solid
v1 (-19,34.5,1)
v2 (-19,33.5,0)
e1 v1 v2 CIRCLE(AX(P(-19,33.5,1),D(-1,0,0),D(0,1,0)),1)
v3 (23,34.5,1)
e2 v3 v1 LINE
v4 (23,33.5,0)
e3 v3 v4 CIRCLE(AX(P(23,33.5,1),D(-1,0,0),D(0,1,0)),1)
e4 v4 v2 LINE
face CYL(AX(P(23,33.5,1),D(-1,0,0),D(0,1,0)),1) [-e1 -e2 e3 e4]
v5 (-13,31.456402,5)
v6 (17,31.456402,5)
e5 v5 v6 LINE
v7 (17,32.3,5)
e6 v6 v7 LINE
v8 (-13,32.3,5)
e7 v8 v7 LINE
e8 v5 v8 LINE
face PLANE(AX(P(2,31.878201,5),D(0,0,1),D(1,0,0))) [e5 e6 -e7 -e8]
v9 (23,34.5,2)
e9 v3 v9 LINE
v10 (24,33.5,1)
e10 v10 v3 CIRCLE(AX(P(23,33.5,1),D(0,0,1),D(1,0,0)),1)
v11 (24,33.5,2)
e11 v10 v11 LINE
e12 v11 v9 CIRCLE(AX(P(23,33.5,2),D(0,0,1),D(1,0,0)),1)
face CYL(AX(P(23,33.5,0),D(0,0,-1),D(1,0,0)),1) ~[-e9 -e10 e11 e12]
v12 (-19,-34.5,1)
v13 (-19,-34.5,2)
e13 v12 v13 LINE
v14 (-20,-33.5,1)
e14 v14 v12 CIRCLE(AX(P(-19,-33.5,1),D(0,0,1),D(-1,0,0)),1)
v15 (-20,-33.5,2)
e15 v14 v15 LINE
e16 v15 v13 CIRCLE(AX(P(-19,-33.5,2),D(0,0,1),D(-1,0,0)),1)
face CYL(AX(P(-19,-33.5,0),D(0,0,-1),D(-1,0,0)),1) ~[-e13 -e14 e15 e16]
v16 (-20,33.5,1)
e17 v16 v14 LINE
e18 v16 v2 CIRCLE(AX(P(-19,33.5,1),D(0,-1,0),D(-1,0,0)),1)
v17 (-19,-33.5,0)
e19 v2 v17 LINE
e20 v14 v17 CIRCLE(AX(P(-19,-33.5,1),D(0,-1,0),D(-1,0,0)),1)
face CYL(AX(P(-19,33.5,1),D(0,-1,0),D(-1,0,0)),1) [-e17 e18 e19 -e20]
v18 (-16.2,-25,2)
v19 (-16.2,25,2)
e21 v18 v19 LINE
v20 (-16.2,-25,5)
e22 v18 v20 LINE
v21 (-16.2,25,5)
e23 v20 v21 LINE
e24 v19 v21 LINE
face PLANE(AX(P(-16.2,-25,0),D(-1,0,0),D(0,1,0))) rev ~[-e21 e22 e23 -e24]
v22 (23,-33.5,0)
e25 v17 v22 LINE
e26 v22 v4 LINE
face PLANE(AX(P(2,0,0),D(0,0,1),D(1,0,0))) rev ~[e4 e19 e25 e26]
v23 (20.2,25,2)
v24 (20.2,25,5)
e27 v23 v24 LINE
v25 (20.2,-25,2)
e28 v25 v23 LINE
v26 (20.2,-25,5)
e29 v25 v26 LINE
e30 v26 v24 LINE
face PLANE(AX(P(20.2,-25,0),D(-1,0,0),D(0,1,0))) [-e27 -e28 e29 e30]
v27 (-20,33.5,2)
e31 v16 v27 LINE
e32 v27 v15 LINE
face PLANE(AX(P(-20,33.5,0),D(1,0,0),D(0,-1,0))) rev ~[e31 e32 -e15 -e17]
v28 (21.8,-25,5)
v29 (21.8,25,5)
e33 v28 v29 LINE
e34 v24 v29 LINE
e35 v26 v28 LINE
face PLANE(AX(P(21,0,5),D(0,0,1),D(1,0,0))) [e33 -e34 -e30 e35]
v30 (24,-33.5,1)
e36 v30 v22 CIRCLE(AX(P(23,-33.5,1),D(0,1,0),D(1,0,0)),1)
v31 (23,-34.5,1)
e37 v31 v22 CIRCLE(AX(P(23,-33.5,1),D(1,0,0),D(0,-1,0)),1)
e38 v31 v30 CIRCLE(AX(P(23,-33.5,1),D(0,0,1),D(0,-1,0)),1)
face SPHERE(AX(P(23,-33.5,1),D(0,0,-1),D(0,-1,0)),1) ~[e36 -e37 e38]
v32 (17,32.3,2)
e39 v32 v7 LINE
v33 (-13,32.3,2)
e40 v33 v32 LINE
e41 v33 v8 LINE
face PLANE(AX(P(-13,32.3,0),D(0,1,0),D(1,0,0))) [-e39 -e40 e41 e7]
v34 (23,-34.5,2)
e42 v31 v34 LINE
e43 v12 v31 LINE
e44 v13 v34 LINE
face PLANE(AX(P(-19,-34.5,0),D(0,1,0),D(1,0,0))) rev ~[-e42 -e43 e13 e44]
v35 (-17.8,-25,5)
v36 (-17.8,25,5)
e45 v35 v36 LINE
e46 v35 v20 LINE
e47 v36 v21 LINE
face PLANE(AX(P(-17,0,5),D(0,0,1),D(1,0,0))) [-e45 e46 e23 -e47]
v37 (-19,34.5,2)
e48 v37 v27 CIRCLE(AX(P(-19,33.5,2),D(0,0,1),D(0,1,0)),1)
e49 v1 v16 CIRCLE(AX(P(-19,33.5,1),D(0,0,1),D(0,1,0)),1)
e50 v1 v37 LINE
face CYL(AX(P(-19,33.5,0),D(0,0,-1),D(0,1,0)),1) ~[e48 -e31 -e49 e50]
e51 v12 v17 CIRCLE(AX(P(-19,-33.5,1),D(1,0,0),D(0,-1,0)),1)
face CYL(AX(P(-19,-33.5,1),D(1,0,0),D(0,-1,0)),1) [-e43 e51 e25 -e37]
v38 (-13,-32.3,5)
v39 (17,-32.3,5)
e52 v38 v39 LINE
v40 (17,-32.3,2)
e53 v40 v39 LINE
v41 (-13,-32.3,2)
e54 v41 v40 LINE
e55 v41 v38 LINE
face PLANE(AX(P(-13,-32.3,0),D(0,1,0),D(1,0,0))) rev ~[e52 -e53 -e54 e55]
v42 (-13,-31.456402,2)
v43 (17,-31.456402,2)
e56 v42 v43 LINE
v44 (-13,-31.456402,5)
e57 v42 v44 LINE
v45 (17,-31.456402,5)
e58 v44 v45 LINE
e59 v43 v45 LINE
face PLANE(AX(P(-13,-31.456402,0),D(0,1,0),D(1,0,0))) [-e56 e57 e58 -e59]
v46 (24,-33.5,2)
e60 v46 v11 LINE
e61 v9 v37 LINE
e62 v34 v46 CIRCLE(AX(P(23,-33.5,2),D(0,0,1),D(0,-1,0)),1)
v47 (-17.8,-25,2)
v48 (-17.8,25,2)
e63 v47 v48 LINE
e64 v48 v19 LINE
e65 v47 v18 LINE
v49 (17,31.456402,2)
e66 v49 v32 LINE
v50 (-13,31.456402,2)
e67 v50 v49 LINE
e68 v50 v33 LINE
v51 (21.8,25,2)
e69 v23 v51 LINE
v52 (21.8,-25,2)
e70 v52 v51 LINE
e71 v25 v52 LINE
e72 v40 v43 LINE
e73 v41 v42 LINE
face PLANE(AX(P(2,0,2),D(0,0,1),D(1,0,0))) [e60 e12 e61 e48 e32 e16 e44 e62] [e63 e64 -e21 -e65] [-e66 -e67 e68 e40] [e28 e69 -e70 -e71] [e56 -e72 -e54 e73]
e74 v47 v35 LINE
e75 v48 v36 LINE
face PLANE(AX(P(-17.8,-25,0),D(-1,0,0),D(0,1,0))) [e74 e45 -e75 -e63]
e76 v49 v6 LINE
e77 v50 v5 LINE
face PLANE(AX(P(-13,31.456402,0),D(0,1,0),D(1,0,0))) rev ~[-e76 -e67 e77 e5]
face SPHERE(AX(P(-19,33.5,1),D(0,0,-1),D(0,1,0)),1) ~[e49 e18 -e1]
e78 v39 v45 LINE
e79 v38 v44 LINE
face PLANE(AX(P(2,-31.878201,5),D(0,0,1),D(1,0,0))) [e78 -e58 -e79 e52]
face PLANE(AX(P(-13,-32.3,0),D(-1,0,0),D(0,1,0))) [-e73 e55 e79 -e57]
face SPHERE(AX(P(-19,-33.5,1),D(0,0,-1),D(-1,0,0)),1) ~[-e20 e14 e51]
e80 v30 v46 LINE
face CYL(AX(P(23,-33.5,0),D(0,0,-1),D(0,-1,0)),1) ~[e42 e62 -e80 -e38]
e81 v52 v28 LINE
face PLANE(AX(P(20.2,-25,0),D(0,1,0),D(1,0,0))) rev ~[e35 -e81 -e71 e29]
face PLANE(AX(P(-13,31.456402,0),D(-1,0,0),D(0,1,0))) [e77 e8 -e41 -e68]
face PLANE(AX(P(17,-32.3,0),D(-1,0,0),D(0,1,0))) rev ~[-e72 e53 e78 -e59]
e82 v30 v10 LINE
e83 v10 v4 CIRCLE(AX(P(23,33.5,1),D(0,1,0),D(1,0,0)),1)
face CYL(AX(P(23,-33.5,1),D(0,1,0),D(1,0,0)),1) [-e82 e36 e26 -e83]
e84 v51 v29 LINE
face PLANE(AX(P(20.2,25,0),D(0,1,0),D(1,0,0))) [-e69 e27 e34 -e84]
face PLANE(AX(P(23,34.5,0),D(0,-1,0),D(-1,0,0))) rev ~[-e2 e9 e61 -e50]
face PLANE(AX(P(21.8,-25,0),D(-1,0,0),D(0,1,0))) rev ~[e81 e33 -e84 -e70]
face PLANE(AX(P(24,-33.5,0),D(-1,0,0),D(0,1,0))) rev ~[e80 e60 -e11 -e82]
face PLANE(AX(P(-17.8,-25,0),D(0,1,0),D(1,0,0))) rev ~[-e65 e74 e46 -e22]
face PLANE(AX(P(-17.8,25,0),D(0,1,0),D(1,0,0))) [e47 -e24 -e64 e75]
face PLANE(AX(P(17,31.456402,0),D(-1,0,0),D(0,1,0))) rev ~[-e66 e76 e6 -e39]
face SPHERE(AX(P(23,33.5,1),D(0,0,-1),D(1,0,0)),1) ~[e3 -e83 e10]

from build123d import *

# Parameters (mm, degrees)
F0_W     = 30
F0_H     = 0.843597576
F0_W_2   = 1.6
F0_H_2   = 50
F1_DEPTH = 2
F2_DEPTH = 5
F3_R     = 1


with BuildPart() as f1:
    # F0 (on Top) → F1 (new body)
    with BuildSketch(Plane.XY):
        with BuildLine():
            Line((-19, -34.5), (23, -34.5))
            ThreePointArc((23, -34.5), (23.7071067812, -34.2071067812), (24, -33.5))
            Line((24, -33.5), (24, 33.5))
            ThreePointArc((24, 33.5), (23.7071067812, 34.2071067812), (23, 34.5))
            Line((23, 34.5), (-19, 34.5))
            ThreePointArc((-19, 34.5), (-19.7071067812, 34.2071067812), (-20, 33.5))
            Line((-20, 33.5), (-20, -33.5))
            ThreePointArc((-20, -33.5), (-19.7071067812, -34.2071067812), (-19, -34.5))
        make_face()
        with Locations((2, -31.878201212)):
            Rectangle(F0_W, F0_H, mode=Mode.SUBTRACT)
        with Locations((-17, 0)):
            Rectangle(F0_W_2, F0_H_2, mode=Mode.SUBTRACT)
        with Locations((21, 0)):
            Rectangle(F0_W_2, F0_H_2, mode=Mode.SUBTRACT)
        with Locations((2, 31.878201212)):
            Rectangle(F0_W, F0_H, mode=Mode.SUBTRACT)
    extrude(amount=F1_DEPTH)

    # F0 (on Top) → F2 (join)
    with BuildSketch(Plane.XY):
        with Locations((-17, 0)):
            Rectangle(F0_W_2, F0_H_2)
        with Locations((2, 31.878201212)):
            Rectangle(F0_W, F0_H)
        with Locations((21, 0)):
            Rectangle(F0_W_2, F0_H_2)
        with Locations((2, -31.878201212)):
            Rectangle(F0_W, F0_H)
    extrude(amount=F2_DEPTH)

    # F3
    f3_edges = [f1.edges().sort_by_distance(p)[0] for p in [
        (-20, 0, 0),
        (-19.707107, -34.207107, 0),
        (2, -34.5, 0),
        (23.707107, -34.207107, 0),
        (24, 0, 0),
        (23.707107, 34.207107, 0),
        (2, 34.5, 0),
        (-19.707107, 34.207107, 0),
    ]]
    fillet(f3_edges, radius=F3_R)


solid = f1.part
